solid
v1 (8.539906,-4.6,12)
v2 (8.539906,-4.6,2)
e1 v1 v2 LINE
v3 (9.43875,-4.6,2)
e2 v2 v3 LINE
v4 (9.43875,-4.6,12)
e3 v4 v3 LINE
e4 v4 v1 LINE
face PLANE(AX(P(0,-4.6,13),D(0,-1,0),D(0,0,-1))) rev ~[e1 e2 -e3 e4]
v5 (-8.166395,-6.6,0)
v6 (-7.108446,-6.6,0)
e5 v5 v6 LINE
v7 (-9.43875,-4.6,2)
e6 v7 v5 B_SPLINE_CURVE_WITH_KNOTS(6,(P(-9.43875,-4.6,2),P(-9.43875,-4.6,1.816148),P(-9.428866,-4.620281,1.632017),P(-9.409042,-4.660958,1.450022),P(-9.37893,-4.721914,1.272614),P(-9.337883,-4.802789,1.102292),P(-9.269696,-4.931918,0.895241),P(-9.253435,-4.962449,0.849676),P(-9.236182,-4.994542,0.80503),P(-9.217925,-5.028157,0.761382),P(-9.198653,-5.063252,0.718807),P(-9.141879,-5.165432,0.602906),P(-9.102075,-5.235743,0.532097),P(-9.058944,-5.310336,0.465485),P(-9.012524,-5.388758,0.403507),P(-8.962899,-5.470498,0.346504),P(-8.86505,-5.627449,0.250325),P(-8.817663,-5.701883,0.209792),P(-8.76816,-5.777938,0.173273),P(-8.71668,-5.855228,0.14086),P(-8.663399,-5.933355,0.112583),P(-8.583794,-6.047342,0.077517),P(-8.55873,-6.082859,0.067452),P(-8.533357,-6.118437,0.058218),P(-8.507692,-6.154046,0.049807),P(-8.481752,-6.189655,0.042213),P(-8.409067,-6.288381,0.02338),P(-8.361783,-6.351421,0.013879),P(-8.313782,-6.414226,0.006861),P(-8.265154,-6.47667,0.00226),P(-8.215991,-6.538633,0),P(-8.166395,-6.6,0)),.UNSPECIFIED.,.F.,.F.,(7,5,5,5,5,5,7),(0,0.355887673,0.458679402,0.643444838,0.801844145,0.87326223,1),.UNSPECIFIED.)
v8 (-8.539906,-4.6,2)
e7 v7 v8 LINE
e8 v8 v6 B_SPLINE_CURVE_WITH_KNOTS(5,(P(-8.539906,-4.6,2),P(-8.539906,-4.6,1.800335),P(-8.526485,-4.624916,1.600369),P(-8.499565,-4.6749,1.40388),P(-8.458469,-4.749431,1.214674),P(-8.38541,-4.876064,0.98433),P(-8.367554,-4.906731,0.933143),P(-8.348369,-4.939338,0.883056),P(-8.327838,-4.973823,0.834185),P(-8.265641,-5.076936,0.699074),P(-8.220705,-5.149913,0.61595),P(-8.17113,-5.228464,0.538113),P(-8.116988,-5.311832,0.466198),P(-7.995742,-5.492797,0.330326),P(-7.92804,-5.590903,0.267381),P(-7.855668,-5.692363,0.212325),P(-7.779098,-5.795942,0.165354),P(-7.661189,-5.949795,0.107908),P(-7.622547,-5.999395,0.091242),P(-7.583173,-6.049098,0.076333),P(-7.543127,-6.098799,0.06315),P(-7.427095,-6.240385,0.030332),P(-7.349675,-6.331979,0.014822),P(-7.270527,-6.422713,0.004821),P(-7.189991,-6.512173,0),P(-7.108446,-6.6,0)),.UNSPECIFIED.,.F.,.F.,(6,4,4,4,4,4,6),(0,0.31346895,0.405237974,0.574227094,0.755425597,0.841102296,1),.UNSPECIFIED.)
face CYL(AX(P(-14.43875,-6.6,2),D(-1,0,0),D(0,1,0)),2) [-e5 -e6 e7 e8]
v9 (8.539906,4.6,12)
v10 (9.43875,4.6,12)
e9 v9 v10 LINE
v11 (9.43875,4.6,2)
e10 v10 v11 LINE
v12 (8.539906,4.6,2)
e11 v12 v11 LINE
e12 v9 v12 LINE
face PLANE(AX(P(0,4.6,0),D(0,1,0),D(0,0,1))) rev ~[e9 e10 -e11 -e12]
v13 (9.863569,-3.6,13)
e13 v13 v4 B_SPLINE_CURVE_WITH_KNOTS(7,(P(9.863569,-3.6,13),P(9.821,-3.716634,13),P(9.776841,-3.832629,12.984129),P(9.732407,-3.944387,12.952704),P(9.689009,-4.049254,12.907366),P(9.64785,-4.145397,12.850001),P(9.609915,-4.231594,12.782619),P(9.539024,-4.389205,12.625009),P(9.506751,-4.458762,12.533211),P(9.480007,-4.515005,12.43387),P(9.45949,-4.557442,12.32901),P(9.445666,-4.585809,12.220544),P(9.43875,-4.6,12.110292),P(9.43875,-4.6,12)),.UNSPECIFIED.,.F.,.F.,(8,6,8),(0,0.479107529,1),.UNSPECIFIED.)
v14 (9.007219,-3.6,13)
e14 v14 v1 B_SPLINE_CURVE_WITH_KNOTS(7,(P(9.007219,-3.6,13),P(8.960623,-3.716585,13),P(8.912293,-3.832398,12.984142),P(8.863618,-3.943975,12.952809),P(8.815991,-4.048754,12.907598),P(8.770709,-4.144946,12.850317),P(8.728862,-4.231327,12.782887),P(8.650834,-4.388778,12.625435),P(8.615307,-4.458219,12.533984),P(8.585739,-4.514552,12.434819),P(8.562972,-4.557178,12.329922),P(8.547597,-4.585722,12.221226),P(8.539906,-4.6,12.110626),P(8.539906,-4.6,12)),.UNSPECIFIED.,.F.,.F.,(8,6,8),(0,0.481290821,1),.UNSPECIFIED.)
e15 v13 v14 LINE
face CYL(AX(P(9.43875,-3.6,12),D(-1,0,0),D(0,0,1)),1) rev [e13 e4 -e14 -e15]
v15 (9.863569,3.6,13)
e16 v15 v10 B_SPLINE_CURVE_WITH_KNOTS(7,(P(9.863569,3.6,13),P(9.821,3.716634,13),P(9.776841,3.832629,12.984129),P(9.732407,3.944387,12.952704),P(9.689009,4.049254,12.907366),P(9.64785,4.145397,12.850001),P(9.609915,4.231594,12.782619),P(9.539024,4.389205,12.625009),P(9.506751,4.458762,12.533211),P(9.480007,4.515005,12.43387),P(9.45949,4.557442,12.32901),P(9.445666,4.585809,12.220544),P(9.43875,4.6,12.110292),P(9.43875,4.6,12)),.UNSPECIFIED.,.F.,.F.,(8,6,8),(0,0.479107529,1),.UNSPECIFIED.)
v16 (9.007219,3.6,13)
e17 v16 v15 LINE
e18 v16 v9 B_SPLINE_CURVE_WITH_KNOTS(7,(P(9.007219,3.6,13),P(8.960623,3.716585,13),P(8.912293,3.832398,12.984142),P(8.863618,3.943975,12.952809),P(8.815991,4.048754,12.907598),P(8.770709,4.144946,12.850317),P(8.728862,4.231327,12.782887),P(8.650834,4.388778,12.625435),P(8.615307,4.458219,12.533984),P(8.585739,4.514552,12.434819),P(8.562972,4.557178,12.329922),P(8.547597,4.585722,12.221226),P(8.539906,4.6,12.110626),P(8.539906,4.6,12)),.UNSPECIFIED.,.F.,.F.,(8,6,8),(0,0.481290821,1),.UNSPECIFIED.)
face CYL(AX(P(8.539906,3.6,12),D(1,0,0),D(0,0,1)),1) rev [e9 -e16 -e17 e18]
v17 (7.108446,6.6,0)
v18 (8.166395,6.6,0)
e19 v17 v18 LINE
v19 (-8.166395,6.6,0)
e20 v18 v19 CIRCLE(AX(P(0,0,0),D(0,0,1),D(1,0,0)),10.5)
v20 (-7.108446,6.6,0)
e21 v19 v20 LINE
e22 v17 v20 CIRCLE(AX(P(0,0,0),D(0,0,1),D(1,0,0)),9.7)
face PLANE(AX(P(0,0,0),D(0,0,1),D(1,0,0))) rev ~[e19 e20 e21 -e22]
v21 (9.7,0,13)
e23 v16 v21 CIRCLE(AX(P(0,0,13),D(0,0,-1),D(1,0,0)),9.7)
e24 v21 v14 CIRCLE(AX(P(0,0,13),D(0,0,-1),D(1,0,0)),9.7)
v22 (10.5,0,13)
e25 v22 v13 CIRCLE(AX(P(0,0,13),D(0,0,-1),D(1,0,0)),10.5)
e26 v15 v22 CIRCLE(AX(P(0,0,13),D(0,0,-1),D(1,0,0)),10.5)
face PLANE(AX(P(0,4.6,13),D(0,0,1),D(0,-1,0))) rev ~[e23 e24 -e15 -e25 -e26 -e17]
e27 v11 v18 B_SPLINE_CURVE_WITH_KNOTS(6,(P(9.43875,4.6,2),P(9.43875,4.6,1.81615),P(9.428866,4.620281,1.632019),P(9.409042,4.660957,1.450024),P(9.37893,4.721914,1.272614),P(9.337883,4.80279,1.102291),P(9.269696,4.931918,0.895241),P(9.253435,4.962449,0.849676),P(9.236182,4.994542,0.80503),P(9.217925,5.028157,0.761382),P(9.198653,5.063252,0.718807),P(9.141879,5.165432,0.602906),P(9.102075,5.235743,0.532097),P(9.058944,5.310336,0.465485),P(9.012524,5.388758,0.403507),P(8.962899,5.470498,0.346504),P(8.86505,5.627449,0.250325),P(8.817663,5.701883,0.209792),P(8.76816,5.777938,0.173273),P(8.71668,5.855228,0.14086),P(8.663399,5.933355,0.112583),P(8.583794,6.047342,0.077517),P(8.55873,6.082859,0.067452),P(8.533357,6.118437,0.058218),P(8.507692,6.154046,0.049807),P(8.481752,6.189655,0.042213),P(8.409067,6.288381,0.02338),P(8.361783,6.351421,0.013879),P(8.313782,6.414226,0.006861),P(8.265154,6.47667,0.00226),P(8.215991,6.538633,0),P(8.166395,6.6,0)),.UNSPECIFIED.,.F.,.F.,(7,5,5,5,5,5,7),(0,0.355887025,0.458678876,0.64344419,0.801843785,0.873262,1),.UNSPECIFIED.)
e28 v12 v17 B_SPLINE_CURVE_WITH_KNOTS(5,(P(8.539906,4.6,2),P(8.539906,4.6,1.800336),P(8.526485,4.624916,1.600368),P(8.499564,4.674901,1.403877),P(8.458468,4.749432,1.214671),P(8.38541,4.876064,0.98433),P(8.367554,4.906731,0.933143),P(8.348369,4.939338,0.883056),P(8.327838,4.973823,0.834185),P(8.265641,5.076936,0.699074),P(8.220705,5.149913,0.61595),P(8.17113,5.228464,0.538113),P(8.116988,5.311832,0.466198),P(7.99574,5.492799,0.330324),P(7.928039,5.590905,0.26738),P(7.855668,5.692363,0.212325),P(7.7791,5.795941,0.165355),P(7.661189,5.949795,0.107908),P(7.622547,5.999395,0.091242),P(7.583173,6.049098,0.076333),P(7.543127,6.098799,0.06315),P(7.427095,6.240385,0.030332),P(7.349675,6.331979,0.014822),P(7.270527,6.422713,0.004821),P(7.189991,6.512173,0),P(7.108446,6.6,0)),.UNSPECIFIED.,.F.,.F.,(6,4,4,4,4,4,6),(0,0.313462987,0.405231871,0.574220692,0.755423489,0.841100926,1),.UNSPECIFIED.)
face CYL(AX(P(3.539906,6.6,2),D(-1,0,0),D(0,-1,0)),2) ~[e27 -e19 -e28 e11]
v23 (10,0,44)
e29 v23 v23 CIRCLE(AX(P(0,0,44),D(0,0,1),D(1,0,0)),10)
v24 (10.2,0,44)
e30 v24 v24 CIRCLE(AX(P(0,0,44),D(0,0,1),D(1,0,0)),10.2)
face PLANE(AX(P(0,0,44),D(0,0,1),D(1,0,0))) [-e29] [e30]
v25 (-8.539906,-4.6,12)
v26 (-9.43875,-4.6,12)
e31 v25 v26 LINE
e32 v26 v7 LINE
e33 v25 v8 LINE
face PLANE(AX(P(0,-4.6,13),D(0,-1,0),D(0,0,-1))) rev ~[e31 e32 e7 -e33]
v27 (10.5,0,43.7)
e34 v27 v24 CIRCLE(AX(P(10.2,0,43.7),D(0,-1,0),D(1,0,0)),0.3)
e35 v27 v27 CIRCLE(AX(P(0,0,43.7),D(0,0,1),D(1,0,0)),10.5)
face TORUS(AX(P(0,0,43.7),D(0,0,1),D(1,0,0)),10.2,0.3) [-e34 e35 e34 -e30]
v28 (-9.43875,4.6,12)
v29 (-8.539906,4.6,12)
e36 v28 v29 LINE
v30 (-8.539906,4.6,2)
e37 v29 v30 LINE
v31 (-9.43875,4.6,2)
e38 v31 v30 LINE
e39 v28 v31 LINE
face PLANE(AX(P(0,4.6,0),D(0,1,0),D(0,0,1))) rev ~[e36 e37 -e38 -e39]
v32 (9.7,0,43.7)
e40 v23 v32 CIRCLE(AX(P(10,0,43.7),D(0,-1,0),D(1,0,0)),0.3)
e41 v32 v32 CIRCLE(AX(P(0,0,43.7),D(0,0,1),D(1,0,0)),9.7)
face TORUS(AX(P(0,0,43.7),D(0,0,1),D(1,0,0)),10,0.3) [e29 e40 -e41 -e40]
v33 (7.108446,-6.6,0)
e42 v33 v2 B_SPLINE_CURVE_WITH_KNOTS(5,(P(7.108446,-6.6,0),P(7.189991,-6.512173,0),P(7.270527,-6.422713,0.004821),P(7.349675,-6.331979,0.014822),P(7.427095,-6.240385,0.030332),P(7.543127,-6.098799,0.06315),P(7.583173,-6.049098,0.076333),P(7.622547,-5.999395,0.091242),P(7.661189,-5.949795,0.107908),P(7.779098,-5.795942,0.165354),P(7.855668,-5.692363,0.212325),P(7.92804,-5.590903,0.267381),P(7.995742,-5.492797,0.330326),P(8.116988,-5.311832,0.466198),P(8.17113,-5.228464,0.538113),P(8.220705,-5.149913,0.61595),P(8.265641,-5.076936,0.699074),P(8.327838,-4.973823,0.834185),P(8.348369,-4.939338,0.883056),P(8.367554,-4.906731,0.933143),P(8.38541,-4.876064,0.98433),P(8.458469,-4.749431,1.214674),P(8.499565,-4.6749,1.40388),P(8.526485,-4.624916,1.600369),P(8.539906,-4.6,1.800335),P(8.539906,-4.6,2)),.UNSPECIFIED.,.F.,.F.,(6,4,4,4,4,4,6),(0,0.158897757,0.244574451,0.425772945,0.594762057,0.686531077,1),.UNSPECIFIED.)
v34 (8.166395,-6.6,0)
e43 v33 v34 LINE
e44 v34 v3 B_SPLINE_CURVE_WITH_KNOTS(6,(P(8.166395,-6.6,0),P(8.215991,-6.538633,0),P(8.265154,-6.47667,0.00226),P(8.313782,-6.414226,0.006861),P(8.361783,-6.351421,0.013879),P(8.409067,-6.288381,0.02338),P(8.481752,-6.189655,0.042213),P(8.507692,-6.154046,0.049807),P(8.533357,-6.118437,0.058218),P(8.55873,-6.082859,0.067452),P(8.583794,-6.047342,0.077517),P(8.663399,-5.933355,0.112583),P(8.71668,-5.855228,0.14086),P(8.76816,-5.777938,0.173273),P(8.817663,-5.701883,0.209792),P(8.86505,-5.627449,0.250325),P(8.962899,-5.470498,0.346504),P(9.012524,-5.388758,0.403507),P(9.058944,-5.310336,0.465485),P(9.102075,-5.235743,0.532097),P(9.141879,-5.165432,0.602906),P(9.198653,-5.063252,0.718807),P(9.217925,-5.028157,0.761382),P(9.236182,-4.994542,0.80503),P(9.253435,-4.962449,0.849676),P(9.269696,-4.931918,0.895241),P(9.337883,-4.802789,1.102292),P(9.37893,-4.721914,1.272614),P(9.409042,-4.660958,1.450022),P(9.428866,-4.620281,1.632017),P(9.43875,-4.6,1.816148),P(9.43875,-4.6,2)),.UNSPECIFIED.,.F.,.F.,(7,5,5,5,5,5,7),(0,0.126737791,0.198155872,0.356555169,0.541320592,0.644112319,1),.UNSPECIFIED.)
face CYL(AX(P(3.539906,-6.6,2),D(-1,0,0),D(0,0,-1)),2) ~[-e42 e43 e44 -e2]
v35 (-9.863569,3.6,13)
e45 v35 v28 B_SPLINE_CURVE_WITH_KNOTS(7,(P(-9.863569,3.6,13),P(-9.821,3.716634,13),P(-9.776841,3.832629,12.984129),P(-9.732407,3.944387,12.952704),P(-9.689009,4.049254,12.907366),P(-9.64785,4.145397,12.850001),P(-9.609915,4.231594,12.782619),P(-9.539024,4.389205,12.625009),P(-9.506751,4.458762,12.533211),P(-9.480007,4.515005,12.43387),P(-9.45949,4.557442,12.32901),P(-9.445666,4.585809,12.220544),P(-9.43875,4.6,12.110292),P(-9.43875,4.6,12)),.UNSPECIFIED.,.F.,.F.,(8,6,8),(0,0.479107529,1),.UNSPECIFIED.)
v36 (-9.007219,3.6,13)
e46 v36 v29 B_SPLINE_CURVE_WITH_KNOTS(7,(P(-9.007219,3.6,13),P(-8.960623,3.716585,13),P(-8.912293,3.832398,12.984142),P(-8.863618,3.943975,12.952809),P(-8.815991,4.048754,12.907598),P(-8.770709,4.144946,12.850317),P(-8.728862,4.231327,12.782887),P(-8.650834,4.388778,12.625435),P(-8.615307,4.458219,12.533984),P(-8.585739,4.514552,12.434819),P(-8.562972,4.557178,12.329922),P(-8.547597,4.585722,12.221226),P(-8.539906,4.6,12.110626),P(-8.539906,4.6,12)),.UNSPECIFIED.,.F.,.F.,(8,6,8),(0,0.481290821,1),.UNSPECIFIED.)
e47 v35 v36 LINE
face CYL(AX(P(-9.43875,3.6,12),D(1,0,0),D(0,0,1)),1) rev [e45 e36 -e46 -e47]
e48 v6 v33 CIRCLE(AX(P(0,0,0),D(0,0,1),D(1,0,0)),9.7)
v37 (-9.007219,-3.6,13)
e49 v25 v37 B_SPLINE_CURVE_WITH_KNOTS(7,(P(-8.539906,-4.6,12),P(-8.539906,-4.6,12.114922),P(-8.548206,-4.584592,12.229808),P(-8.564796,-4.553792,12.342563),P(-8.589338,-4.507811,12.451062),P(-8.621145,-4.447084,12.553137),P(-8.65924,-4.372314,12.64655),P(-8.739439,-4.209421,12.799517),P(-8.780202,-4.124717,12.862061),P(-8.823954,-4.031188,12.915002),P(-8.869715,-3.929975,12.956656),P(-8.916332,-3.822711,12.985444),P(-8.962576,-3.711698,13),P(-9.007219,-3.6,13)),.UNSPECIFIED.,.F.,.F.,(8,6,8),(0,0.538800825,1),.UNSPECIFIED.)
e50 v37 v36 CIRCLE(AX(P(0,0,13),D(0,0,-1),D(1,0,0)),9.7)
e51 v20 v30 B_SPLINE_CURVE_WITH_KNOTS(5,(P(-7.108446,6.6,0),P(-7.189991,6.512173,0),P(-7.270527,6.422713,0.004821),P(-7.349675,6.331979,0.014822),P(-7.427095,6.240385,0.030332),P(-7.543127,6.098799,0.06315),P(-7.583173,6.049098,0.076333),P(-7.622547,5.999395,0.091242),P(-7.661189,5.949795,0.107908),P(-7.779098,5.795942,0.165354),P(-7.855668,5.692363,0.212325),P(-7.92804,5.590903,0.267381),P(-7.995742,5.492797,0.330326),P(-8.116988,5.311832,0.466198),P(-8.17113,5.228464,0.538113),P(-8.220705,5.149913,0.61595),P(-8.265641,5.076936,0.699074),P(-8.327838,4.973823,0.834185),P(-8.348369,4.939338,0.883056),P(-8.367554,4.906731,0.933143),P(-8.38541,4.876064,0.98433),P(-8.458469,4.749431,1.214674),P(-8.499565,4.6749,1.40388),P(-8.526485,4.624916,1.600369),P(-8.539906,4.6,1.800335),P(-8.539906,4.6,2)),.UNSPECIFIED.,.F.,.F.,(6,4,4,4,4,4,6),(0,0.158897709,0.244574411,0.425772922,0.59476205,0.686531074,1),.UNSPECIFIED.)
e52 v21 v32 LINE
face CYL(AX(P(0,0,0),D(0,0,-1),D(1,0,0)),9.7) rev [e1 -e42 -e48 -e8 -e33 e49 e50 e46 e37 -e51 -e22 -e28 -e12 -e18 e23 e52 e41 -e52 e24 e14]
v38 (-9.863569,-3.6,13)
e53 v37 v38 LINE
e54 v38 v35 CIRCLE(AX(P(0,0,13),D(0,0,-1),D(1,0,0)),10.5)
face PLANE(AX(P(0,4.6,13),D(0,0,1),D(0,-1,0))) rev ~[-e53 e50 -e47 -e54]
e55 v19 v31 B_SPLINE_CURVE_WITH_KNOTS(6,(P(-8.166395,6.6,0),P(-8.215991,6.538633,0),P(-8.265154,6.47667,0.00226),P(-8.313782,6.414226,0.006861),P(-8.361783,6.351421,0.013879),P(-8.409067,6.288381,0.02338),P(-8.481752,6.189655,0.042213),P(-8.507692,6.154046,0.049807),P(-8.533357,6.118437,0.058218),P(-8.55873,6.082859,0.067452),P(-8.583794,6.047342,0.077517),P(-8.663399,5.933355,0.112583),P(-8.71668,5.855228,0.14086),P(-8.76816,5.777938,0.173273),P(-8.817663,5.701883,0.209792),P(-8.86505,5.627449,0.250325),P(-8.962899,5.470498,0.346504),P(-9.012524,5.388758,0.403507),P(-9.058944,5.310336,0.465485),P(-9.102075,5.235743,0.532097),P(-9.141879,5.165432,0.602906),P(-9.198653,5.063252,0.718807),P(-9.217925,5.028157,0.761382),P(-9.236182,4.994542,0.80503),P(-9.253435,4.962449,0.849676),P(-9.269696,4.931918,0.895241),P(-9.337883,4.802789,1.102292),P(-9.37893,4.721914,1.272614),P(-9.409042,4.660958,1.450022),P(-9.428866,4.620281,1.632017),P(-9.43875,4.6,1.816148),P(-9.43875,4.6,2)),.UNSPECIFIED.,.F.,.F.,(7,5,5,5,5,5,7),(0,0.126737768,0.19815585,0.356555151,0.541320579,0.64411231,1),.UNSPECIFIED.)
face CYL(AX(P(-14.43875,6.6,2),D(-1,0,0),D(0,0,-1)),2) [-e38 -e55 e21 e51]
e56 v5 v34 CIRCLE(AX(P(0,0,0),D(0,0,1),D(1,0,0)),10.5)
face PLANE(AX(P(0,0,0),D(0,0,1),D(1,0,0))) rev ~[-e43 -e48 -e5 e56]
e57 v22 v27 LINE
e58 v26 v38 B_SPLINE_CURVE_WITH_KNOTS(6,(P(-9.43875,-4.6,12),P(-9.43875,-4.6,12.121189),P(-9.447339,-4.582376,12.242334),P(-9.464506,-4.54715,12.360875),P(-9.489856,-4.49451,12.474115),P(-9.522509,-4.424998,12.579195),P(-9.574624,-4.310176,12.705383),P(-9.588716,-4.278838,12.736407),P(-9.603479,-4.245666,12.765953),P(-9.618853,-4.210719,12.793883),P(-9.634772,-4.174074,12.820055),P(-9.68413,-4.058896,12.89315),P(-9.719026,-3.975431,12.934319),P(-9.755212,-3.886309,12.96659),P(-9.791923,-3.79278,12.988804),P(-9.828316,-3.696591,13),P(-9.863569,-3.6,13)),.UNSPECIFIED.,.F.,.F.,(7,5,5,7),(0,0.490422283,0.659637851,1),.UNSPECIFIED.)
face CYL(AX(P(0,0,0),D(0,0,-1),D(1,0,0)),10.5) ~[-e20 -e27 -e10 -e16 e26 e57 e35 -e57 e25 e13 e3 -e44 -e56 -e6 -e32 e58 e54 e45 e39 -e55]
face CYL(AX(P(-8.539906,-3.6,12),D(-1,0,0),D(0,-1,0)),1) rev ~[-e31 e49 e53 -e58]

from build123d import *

# Parameters (mm, degrees)
F0_R        = 10.5
F0_R_2      = 9.7
F1_DEPTH    = 44
F3_DEPTH    = 20.75
F4_T1_DEPTH = 10.8988435946
F4_T3_DEPTH = 10.8988435946
F5_R        = 0.3
F6_R        = 1


# Not quite as in the source:
# - a fillet or chamfer that OpenCascade refuses, or shapes differently, is made with other operations: its cross-section is extruded or revolved along the edge and cut away or added


with BuildPart() as f1:
    # F0 (on Top) → F1 (new body)
    with BuildSketch(Plane.XY):
        Circle(F0_R)
        Circle(F0_R_2, mode=Mode.SUBTRACT)
    extrude(amount=F1_DEPTH)

    # F2 (on Right) → F3 (cut, symmetric)
    with BuildSketch(Plane.YZ):
        Polygon((-11.3, 0), (-11.3, -7.5), (11.3, -7.5), (11.3, 0), (4.6, 0), (4.6, 13), (-4.6, 13), (-4.6, 0), align=None)
    extrude(amount=F3_DEPTH, both=True, mode=Mode.SUBTRACT)

    # F4: fillet of radius 2 on 4 edges, made by hand

    # F4_s2 → F4_t1 (cut)
    with BuildSketch(Plane.YZ.offset(-14.4387499172)):
        with BuildLine():
            ThreePointArc((-4.6, 2), (-5.1857864376, 0.5857864376), (-6.6, 0))
            Line((-6.6, 0), (-4.6, 0))
            Line((-4.6, 0), (-4.6, 2))
        make_face()
        with BuildLine():
            ThreePointArc((6.6, 0), (5.1857864376, 0.5857864376), (4.6, 2))
            Line((4.6, 2), (4.6, 0))
            Line((4.6, 0), (6.6, 0))
        make_face()
    extrude(amount=F4_T1_DEPTH, mode=Mode.SUBTRACT)

    # F4_s4 → F4_t3 (cut)
    with BuildSketch(Plane.YZ.offset(3.5399063227)):
        with BuildLine():
            ThreePointArc((-6.6, 0), (-5.1857864376, 0.5857864376), (-4.6, 2))
            Line((-4.6, 2), (-4.6, 0))
            Line((-4.6, 0), (-6.6, 0))
        make_face()
        with BuildLine():
            ThreePointArc((4.6, 2), (5.1857864376, 0.5857864376), (6.6, 0))
            Line((6.6, 0), (4.6, 0))
            Line((4.6, 0), (4.6, 2))
        make_face()
    extrude(amount=F4_T3_DEPTH, mode=Mode.SUBTRACT)

    # F5
    f5_edges = [f1.edges().sort_by_distance(p)[0] for p in [
        (-10.5, 0, 44),
        (-9.7, 0, 44),
    ]]
    fillet(f5_edges, radius=F5_R)

    # F6
    f6_edges = [f1.edges().sort_by_distance(p)[0] for p in [
        (8.989328, -4.6, 13),
        (-8.989328, -4.6, 13),
        (8.989328, 4.6, 13),
        (-8.989328, 4.6, 13),
    ]]
    fillet(f6_edges, radius=F6_R)


solid = f1.part
